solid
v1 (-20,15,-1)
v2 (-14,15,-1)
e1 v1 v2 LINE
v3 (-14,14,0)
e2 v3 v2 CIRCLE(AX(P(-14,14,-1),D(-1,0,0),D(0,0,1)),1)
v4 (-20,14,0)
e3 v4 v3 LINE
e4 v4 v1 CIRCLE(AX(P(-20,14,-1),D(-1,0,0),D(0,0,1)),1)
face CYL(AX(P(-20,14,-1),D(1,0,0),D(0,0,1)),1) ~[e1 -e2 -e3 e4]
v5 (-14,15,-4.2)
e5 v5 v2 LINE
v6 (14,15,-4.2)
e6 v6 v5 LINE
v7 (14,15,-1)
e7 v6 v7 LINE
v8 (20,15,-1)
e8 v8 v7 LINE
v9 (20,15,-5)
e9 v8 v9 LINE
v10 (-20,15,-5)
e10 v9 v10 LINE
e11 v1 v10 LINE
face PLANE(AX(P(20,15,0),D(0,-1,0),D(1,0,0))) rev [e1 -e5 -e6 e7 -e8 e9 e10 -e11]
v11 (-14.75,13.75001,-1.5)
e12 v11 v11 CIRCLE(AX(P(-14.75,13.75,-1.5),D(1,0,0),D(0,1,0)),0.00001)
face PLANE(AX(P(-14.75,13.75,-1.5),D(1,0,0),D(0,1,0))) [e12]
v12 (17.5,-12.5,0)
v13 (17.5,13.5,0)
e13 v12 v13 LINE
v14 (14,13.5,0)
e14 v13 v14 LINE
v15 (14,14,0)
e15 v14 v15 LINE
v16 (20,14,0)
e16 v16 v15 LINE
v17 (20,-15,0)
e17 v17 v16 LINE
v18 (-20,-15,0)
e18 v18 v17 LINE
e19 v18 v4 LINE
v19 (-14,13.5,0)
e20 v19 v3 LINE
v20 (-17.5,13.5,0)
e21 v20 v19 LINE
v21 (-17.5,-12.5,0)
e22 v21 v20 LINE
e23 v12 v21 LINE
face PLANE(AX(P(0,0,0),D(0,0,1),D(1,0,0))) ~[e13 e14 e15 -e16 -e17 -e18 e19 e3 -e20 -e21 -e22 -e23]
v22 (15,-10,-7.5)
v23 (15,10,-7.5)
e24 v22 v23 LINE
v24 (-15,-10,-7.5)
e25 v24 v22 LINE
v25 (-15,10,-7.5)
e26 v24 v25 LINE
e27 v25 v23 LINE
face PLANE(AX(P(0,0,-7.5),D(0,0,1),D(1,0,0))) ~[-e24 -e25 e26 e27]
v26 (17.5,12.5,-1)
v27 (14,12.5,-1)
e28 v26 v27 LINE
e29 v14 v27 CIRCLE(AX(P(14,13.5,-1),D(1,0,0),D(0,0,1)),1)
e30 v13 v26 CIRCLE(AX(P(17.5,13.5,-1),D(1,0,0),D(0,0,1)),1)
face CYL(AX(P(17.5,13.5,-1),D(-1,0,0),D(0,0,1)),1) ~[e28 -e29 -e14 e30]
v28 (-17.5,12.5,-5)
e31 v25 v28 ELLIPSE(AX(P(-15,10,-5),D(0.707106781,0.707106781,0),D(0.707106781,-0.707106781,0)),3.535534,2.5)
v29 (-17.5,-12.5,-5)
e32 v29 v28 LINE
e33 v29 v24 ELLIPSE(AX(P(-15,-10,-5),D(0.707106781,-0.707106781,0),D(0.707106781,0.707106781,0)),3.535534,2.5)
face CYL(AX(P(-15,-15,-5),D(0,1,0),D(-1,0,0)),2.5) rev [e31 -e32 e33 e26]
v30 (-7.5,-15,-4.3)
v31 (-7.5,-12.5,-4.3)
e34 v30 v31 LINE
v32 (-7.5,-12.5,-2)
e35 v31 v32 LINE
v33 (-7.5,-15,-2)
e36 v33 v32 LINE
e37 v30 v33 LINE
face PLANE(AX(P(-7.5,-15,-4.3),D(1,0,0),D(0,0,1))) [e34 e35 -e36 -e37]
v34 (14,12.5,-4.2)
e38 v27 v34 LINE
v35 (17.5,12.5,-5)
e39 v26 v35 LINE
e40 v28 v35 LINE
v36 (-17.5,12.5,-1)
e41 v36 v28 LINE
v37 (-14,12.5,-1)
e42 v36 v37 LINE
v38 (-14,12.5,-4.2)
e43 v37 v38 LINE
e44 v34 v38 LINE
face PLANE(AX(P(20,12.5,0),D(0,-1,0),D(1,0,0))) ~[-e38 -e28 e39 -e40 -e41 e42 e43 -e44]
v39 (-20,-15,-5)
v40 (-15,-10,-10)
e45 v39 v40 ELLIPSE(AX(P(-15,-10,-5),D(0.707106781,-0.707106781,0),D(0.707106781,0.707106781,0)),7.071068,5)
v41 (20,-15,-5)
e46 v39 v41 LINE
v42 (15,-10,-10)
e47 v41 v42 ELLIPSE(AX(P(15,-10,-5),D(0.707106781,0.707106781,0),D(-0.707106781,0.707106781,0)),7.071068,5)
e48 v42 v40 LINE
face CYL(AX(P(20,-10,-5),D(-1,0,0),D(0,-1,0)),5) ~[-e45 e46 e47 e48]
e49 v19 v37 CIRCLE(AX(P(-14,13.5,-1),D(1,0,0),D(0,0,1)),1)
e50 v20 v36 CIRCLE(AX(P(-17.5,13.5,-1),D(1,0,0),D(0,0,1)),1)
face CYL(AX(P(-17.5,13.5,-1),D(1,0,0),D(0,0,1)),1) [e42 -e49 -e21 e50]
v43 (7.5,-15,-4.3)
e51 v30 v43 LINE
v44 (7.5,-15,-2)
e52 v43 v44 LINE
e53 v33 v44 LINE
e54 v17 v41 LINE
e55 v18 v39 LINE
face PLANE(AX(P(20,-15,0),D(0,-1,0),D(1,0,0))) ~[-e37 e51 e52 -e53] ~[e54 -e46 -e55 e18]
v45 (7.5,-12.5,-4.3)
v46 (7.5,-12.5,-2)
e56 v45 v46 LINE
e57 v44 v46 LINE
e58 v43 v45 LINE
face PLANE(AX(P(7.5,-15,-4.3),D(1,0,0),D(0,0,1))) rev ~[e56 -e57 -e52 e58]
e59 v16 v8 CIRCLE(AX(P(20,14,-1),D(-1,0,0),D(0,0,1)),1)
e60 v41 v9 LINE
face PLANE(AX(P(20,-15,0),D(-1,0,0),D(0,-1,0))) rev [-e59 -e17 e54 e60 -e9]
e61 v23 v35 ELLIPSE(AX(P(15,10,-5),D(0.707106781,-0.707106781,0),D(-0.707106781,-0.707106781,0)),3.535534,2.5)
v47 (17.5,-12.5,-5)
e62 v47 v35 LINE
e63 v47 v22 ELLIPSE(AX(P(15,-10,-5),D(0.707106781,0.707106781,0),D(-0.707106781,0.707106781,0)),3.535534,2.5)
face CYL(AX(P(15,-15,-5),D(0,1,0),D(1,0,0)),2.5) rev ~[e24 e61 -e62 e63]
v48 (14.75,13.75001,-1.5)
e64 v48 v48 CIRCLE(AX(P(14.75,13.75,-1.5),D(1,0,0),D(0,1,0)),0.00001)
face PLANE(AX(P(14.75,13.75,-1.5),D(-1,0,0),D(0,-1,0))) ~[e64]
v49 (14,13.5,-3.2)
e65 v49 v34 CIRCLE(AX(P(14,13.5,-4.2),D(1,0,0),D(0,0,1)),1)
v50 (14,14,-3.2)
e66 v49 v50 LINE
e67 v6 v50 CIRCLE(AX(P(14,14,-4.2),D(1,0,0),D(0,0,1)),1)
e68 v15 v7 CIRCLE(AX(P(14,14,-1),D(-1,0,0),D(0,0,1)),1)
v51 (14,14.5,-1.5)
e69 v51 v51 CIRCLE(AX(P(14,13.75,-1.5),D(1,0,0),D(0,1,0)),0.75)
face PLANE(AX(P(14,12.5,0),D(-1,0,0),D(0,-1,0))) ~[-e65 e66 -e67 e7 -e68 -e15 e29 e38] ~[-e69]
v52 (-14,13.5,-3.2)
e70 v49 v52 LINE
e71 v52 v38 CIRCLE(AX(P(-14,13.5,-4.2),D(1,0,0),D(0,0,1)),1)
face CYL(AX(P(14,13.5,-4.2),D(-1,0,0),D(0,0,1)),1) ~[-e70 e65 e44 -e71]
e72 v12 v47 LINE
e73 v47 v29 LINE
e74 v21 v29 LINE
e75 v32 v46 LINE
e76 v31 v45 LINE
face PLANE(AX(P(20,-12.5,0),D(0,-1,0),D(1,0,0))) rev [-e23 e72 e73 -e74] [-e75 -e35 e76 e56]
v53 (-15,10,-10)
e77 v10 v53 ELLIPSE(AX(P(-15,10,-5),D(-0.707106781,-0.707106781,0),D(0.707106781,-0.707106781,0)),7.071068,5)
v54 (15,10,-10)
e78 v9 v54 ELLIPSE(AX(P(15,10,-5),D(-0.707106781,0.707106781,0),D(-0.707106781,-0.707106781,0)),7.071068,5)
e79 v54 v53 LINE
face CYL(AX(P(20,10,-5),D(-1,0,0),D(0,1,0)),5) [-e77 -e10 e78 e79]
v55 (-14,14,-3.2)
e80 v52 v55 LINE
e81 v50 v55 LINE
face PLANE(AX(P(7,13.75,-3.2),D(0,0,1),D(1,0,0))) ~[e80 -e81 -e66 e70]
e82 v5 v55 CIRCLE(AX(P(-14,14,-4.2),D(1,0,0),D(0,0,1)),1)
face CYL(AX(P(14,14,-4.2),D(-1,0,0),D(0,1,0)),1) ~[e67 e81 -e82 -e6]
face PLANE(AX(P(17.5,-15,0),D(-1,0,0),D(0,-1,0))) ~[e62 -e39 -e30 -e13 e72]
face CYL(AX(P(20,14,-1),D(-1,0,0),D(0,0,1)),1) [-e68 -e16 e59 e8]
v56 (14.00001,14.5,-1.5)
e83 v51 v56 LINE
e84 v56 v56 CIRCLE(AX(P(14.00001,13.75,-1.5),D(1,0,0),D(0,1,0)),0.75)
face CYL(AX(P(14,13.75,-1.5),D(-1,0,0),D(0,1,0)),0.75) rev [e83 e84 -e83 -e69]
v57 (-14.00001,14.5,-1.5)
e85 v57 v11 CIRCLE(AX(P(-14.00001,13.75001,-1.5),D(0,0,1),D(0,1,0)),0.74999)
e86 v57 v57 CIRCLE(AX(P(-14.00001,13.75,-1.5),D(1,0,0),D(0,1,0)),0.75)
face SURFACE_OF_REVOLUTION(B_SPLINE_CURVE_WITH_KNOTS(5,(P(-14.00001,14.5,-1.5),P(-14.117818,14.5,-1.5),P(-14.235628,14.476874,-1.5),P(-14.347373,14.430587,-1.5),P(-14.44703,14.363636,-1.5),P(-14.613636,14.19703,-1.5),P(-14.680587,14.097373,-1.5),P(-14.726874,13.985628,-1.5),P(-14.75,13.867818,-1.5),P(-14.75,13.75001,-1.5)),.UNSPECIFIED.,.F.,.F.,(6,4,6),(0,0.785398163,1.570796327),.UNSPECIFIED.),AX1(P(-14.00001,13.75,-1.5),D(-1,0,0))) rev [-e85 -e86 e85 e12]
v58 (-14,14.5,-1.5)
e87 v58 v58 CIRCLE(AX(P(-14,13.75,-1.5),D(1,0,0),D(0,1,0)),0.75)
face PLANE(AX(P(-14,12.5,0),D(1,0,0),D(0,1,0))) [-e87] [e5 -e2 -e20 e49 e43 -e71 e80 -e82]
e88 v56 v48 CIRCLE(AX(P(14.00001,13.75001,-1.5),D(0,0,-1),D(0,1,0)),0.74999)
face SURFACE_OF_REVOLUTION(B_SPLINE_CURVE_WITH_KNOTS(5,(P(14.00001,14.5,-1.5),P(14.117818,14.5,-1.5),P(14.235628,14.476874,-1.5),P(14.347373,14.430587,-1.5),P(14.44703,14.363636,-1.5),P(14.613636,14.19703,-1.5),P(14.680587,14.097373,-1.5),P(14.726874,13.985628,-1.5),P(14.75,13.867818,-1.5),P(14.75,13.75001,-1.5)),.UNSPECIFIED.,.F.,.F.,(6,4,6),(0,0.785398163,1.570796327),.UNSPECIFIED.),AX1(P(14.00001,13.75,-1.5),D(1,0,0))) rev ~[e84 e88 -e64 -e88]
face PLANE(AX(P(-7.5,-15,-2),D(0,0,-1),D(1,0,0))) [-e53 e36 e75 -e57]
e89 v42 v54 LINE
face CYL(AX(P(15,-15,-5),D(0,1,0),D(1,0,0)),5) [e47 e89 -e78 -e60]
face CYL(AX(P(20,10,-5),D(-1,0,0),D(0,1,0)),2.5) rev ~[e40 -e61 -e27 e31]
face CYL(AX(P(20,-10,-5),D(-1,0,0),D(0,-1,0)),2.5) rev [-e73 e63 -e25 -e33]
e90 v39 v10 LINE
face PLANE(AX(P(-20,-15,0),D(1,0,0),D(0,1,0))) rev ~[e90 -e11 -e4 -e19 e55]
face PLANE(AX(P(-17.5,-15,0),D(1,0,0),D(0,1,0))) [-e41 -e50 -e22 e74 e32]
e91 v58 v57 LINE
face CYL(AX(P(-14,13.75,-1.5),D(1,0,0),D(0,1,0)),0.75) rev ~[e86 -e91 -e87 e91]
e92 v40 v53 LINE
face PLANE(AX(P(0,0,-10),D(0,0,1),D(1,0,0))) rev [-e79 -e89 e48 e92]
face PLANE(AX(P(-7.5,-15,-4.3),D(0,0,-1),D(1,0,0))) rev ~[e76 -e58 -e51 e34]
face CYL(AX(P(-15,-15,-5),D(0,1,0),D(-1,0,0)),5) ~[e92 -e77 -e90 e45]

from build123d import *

# Parameters (mm, degrees)
F0_W      = 40
F0_H      = 30
F1_DEPTH  = 10
F2_R      = 5
F3_T      = -2.5
F4_W      = 28
F4_H      = 2.5
F5_DEPTH  = 3
F6_W      = 32.3581136763
F6_H      = 60.2468792349
F7_DEPTH  = 25
F8_R      = 0.75
F9_DEPTH  = 0.75
F10_R     = 0.74999
F11_W     = 14
F11_H     = 2.5
F12_DEPTH = 0.2
F13_R     = 1
F15_W     = 15
F15_H     = 2.3
F16_DEPTH = 2.5


# Not quite as in the source:
# - a fillet or chamfer is up to 0.001 mm smaller than in the source, because OpenCascade refuses the exact size


with BuildPart() as f1:
    # F0 (on Top) → F1 (new body)
    with BuildSketch(Plane.XY):
        Rectangle(F0_W, F0_H)
    extrude(amount=-F1_DEPTH)

    # F2
    f2_edges = [f1.edges().sort_by_distance(p)[0] for p in [
        (20, 0, -10),
        (0, 15, -10),
        (-20, 0, -10),
        (0, -15, -10),
    ]]
    fillet(f2_edges, radius=F2_R)

    # F3
    f3_openings = [f1.faces().sort_by_distance(p)[0] for p in [
        (0, 0, 0),
    ]]
    offset(amount=F3_T, openings=f3_openings)

    # F4 (on face) → F5 (cut)
    with BuildSketch(Plane.XY):
        with Locations((0, 13.75)):
            Rectangle(F4_W, F4_H)
    extrude(amount=-F5_DEPTH, mode=Mode.SUBTRACT)

    # F6 (on Top) → F7 (cut)
    with BuildSketch(Plane.XY):
        with Locations((16.1790568382, -2.0559011027)):
            Rectangle(F6_W, F6_H)
    extrude(amount=-F7_DEPTH, mode=Mode.SUBTRACT)

    # F8 (on face) → F9 (cut)
    with BuildSketch(Plane.YZ.offset(-14)):
        with Locations((13.75, -1.5)):
            Circle(F8_R)
    extrude(amount=-F9_DEPTH, mode=Mode.SUBTRACT)

    # F10 (radius 0.75 in the source; OpenCascade refuses exactly that, so slightly less here)
    f10_edges = [f1.edges().sort_by_distance(p)[0] for p in [
        (-14.75, 13, -1.5),
    ]]
    fillet(f10_edges, radius=F10_R)

    # F11 (on face) → F12 (cut)
    with BuildSketch(Plane.XY.offset(-3)):
        with Locations((-7, 13.75)):
            Rectangle(F11_W, F11_H)
    extrude(amount=-F12_DEPTH, mode=Mode.SUBTRACT)

    # F13
    f13_edges = [f1.edges().sort_by_distance(p)[0] for p in [
        (-17, 15, 0),
        (-15.75, 12.5, 0),
        (-7, 15, -3.2),
        (-7, 12.5, -3.2),
    ]]
    fillet(f13_edges, radius=F13_R)

    # F14: F1 across plane


with BuildPart() as f1_1:
    add(f1.part)
    add(f1.part.mirror(Plane.YZ))

    # F15 (on face) → F16 (cut, through all)
    with BuildSketch(Plane.XZ.offset(15)):
        with Locations((0, -3.15)):
            Rectangle(F15_W, F15_H)
    extrude(amount=-F16_DEPTH, mode=Mode.SUBTRACT)


solid = f1_1.part
